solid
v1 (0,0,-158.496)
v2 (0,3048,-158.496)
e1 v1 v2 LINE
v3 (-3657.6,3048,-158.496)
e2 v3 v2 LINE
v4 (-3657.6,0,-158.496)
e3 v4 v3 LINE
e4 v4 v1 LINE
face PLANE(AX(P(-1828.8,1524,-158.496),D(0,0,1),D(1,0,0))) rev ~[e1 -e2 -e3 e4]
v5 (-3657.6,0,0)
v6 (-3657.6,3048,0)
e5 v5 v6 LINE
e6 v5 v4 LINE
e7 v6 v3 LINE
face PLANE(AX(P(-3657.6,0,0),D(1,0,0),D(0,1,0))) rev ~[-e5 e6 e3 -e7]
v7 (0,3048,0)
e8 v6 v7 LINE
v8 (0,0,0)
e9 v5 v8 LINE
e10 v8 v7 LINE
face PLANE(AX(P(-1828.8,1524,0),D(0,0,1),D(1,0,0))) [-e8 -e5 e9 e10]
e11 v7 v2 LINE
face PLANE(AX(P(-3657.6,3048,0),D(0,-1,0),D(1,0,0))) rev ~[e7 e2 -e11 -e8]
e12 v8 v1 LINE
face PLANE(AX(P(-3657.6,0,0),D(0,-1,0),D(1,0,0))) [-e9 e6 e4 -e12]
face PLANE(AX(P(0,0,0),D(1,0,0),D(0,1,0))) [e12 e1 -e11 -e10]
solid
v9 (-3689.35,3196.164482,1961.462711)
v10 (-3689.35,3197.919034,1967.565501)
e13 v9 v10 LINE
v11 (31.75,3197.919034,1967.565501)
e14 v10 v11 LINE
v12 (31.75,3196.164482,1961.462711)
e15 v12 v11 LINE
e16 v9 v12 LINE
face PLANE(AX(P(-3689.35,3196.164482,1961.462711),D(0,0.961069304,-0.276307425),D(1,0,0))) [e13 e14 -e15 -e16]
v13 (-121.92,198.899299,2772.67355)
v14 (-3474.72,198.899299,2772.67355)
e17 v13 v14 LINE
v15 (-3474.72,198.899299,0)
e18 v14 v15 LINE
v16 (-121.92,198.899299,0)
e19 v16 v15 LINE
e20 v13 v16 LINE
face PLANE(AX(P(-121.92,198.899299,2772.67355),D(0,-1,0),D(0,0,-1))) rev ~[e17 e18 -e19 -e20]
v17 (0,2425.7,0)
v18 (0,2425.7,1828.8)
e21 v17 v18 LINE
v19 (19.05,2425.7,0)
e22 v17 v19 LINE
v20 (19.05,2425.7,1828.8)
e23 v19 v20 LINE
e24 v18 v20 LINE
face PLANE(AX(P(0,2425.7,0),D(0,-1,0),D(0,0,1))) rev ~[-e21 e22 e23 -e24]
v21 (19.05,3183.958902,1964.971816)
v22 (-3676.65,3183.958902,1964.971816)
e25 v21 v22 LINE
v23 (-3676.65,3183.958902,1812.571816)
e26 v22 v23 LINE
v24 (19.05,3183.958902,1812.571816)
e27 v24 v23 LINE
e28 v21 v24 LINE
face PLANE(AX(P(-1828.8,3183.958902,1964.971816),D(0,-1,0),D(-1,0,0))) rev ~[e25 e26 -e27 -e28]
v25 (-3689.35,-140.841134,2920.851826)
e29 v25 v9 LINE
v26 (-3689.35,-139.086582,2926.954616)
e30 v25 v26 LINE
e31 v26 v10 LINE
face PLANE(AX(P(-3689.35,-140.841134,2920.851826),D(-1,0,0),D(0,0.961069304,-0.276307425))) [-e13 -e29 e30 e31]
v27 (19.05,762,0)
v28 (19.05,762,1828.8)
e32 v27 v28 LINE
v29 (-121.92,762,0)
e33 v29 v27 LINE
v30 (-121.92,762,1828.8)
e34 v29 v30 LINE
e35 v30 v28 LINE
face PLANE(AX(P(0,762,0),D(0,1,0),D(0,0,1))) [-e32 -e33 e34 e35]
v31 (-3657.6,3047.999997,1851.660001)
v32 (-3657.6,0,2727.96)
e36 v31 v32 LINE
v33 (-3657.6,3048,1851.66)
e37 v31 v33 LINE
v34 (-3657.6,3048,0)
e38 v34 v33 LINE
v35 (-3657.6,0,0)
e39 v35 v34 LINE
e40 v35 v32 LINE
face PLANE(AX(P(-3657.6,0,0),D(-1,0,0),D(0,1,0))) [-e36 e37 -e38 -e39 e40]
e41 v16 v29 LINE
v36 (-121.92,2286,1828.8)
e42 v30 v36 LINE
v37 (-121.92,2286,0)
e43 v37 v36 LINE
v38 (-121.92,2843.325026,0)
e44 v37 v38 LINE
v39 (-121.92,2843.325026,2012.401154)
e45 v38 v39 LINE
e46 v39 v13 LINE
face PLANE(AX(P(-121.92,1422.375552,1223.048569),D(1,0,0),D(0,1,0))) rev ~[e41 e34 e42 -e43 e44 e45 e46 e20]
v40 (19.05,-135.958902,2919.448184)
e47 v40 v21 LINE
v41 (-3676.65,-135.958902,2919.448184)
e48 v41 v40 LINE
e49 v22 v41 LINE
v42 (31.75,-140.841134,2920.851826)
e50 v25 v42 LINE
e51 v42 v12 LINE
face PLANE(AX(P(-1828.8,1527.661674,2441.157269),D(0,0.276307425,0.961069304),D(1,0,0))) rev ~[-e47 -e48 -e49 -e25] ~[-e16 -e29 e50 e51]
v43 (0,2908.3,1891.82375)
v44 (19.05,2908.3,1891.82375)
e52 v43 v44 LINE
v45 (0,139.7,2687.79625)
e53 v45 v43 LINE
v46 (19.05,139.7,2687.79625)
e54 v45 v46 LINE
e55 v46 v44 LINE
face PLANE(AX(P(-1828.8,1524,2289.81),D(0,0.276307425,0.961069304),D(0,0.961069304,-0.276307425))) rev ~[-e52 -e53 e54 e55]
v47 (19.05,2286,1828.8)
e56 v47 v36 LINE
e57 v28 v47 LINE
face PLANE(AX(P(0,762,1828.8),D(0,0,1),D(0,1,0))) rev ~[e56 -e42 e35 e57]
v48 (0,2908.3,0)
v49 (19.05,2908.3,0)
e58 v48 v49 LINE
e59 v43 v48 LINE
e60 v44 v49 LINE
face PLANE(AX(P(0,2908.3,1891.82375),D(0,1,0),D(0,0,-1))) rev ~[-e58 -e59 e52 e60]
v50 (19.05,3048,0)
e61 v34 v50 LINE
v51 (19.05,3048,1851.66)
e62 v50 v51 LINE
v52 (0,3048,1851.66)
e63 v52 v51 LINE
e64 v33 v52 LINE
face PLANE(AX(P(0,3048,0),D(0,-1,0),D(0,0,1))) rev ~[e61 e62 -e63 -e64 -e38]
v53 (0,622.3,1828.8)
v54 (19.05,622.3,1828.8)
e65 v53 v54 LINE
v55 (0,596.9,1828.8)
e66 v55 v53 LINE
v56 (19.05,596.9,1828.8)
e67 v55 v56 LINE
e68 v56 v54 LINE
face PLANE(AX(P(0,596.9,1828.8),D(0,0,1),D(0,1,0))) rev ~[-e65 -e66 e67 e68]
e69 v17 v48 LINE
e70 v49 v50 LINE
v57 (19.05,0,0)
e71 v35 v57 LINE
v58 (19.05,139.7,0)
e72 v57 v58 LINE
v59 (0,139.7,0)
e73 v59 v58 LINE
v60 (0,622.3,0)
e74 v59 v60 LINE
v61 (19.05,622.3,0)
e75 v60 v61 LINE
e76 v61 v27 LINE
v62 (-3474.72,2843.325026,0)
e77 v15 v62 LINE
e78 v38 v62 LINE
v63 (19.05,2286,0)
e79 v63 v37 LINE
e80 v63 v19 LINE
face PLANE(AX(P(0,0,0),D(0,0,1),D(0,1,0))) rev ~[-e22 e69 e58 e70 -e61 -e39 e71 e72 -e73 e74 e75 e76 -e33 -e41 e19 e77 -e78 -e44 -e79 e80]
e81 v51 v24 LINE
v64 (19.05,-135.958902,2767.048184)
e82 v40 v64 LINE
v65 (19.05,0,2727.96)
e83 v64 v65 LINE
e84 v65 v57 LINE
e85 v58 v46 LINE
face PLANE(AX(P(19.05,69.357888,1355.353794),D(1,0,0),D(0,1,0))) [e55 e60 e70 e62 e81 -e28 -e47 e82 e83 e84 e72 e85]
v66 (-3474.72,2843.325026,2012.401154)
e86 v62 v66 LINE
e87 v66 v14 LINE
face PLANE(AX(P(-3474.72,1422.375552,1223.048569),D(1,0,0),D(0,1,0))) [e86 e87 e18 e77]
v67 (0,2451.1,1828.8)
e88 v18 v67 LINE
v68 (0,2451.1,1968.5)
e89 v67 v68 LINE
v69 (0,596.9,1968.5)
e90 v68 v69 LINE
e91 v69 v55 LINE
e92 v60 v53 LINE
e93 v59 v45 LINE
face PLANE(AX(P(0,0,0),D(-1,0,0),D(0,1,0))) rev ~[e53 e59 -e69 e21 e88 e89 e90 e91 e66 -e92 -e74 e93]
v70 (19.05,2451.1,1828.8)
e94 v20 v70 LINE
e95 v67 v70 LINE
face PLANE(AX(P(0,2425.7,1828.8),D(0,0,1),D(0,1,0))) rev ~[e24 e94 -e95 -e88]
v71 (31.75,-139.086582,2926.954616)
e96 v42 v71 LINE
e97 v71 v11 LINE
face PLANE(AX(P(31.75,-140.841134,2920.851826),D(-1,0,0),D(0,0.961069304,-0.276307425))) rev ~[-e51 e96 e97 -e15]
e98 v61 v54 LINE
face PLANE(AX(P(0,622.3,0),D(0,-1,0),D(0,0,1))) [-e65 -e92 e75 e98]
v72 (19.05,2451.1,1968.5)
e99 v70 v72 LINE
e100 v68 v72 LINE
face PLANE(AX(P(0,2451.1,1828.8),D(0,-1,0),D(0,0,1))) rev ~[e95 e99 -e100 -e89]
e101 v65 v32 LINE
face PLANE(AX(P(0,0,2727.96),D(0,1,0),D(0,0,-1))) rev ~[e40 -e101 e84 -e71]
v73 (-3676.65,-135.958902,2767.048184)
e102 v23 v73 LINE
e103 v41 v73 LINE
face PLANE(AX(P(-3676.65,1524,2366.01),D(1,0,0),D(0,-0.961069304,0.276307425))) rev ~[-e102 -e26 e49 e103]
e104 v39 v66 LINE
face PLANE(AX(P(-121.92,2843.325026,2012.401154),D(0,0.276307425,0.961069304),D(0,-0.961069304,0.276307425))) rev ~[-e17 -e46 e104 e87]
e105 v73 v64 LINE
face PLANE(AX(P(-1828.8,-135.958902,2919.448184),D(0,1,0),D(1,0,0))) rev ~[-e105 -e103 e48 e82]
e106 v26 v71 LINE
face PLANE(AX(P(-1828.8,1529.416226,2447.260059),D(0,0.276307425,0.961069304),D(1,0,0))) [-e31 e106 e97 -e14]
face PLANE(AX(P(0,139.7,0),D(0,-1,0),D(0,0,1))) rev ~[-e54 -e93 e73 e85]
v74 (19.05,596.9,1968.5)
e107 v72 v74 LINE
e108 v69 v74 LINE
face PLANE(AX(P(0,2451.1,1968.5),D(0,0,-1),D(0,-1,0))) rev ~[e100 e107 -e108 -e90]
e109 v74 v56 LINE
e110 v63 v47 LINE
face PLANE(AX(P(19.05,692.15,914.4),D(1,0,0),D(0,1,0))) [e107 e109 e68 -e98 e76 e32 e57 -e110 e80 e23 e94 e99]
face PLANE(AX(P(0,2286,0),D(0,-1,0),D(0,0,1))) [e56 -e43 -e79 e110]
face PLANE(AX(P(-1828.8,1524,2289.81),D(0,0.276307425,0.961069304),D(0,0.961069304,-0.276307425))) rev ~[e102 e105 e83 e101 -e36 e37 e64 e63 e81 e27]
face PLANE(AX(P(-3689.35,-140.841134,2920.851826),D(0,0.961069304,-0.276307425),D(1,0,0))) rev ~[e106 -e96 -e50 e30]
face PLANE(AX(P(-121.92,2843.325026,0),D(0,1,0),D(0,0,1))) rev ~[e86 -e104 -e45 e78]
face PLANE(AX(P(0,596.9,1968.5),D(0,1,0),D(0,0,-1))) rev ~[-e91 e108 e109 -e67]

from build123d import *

# Parameters (mm, degrees)
F0_W      = 3657.6
F0_H      = 3048
F1_DEPTH  = 2880.36
F2_SIZE2  = 3047.99999
F2_SIZE   = 876.29999
F3_W      = 3695.7
F3_H      = 3454.4
F3_W_2    = 3657.6
F3_H_2    = 3171.4674224267
F6_W      = 3721.1
F6_H      = 3472.18
F7_DEPTH  = 6.35
F8_W      = 139.7
F8_H      = 1828.8
F9_DEPTH  = 19.05
F10_DEPTH = 121.92
F12_DEPTH = 3352.8
F13_W     = 3657.6
F13_H     = 3048
F14_DEPTH = 158.496


# Not quite as in the source:
# - a fillet or chamfer is up to 0.001 mm smaller than in the source, because OpenCascade refuses the exact size


with BuildPart() as f1:
    # F0 (on Top) → F1 (new body)
    with BuildSketch(Plane.XY):
        with Locations((-1828.8, 1524)):
            Rectangle(F0_W, F0_H)
    extrude(amount=F1_DEPTH)

    # F2 (size 876.3 and 3048 in the source; OpenCascade refuses exactly that, so slightly less here)
    f2_edges = [f1.edges().sort_by_distance(p)[0] for p in [
        (-1828.8, 3048, 2880.36),
    ]]
    f2_side = f1.faces().sort_by_distance((-1828.8, 3048, 1440.18))[0]
    chamfer(f2_edges, length=F2_SIZE, length2=F2_SIZE2, reference=f2_side)

    # F5: sweep along a path in F4
    with BuildLine(Plane.YZ) as f5_path:
        Line((0, 2880.36), (0, 2727.96))
    # F3 (on face) → F5 (sweep)
    with BuildSketch(Plane(origin=(0, 764.8812815702, 2660.4566315486), x_dir=(1, 0, 0), z_dir=(0, 0.2763074249, 0.9610693039))):
        with Locations((-1828.8, 789.8688630733)):
            Rectangle(F3_W, F3_H)
        with Locations((-1828.8, 789.8688664972)):
            Rectangle(F3_W_2, F3_H_2, mode=Mode.SUBTRACT)
    sweep(path=f5_path.line)

    # F6 (on face) → F7 (join)
    with BuildSketch(Plane(origin=(0, 764.8812815702, 2660.4566315486), x_dir=(1, 0, 0), z_dir=(0, 0.2763074249, 0.9610693039))):
        with Locations((-1828.8, 793.6788630733)):
            Rectangle(F6_W, F6_H)
    extrude(amount=F7_DEPTH)

    # F8 (on face) → F9 (join)
    with BuildSketch(Plane.YZ):
        Polygon((0, 2727.96), (0, 0), (139.7, 0), (139.7, 2687.79625), align=None)
        Polygon((2908.3, 0), (3048, 0), (3048, 1851.66), (2908.3, 1891.82375), align=None)
        with Locations((692.15, 914.4)):
            Rectangle(F8_W, F8_H)
        Polygon((622.3, 1828.8), (762, 1828.8), (1524, 1828.8), (2286, 1828.8), (2425.7, 1828.8), (2451.1, 1828.8), (2451.1, 1968.5), (1524, 1968.5), (596.9, 1968.5), (596.9, 1828.8), align=None)
        with Locations((2355.85, 914.4)):
            Rectangle(F8_W, F8_H)
    extrude(amount=F9_DEPTH)

    # F10 (cut): a face of the model
    f10_faces = [f1.faces().sort_by_distance(p)[0] for p in [
        (0, 1524, 914.4),
    ]]
    extrude(f10_faces, amount=-F10_DEPTH, mode=Mode.SUBTRACT)

    # F11 (on face) → F12 (cut)
    with BuildSketch(Plane.YZ.offset(-121.92)):
        Polygon((198.8992989063, 0), (2843.3250255278, 0), (2843.3250255278, 2012.4011538445), (198.8992989063, 2772.6735502481), align=None)
    extrude(amount=-F12_DEPTH, mode=Mode.SUBTRACT)


with BuildPart() as f14:
    # F13 (on Top) → F14 (new body)
    with BuildSketch(Plane.XY):
        with Locations((-1828.8, 1524)):
            Rectangle(F13_W, F13_H)
    extrude(amount=-F14_DEPTH)


solid = Compound([f1.part, f14.part])
